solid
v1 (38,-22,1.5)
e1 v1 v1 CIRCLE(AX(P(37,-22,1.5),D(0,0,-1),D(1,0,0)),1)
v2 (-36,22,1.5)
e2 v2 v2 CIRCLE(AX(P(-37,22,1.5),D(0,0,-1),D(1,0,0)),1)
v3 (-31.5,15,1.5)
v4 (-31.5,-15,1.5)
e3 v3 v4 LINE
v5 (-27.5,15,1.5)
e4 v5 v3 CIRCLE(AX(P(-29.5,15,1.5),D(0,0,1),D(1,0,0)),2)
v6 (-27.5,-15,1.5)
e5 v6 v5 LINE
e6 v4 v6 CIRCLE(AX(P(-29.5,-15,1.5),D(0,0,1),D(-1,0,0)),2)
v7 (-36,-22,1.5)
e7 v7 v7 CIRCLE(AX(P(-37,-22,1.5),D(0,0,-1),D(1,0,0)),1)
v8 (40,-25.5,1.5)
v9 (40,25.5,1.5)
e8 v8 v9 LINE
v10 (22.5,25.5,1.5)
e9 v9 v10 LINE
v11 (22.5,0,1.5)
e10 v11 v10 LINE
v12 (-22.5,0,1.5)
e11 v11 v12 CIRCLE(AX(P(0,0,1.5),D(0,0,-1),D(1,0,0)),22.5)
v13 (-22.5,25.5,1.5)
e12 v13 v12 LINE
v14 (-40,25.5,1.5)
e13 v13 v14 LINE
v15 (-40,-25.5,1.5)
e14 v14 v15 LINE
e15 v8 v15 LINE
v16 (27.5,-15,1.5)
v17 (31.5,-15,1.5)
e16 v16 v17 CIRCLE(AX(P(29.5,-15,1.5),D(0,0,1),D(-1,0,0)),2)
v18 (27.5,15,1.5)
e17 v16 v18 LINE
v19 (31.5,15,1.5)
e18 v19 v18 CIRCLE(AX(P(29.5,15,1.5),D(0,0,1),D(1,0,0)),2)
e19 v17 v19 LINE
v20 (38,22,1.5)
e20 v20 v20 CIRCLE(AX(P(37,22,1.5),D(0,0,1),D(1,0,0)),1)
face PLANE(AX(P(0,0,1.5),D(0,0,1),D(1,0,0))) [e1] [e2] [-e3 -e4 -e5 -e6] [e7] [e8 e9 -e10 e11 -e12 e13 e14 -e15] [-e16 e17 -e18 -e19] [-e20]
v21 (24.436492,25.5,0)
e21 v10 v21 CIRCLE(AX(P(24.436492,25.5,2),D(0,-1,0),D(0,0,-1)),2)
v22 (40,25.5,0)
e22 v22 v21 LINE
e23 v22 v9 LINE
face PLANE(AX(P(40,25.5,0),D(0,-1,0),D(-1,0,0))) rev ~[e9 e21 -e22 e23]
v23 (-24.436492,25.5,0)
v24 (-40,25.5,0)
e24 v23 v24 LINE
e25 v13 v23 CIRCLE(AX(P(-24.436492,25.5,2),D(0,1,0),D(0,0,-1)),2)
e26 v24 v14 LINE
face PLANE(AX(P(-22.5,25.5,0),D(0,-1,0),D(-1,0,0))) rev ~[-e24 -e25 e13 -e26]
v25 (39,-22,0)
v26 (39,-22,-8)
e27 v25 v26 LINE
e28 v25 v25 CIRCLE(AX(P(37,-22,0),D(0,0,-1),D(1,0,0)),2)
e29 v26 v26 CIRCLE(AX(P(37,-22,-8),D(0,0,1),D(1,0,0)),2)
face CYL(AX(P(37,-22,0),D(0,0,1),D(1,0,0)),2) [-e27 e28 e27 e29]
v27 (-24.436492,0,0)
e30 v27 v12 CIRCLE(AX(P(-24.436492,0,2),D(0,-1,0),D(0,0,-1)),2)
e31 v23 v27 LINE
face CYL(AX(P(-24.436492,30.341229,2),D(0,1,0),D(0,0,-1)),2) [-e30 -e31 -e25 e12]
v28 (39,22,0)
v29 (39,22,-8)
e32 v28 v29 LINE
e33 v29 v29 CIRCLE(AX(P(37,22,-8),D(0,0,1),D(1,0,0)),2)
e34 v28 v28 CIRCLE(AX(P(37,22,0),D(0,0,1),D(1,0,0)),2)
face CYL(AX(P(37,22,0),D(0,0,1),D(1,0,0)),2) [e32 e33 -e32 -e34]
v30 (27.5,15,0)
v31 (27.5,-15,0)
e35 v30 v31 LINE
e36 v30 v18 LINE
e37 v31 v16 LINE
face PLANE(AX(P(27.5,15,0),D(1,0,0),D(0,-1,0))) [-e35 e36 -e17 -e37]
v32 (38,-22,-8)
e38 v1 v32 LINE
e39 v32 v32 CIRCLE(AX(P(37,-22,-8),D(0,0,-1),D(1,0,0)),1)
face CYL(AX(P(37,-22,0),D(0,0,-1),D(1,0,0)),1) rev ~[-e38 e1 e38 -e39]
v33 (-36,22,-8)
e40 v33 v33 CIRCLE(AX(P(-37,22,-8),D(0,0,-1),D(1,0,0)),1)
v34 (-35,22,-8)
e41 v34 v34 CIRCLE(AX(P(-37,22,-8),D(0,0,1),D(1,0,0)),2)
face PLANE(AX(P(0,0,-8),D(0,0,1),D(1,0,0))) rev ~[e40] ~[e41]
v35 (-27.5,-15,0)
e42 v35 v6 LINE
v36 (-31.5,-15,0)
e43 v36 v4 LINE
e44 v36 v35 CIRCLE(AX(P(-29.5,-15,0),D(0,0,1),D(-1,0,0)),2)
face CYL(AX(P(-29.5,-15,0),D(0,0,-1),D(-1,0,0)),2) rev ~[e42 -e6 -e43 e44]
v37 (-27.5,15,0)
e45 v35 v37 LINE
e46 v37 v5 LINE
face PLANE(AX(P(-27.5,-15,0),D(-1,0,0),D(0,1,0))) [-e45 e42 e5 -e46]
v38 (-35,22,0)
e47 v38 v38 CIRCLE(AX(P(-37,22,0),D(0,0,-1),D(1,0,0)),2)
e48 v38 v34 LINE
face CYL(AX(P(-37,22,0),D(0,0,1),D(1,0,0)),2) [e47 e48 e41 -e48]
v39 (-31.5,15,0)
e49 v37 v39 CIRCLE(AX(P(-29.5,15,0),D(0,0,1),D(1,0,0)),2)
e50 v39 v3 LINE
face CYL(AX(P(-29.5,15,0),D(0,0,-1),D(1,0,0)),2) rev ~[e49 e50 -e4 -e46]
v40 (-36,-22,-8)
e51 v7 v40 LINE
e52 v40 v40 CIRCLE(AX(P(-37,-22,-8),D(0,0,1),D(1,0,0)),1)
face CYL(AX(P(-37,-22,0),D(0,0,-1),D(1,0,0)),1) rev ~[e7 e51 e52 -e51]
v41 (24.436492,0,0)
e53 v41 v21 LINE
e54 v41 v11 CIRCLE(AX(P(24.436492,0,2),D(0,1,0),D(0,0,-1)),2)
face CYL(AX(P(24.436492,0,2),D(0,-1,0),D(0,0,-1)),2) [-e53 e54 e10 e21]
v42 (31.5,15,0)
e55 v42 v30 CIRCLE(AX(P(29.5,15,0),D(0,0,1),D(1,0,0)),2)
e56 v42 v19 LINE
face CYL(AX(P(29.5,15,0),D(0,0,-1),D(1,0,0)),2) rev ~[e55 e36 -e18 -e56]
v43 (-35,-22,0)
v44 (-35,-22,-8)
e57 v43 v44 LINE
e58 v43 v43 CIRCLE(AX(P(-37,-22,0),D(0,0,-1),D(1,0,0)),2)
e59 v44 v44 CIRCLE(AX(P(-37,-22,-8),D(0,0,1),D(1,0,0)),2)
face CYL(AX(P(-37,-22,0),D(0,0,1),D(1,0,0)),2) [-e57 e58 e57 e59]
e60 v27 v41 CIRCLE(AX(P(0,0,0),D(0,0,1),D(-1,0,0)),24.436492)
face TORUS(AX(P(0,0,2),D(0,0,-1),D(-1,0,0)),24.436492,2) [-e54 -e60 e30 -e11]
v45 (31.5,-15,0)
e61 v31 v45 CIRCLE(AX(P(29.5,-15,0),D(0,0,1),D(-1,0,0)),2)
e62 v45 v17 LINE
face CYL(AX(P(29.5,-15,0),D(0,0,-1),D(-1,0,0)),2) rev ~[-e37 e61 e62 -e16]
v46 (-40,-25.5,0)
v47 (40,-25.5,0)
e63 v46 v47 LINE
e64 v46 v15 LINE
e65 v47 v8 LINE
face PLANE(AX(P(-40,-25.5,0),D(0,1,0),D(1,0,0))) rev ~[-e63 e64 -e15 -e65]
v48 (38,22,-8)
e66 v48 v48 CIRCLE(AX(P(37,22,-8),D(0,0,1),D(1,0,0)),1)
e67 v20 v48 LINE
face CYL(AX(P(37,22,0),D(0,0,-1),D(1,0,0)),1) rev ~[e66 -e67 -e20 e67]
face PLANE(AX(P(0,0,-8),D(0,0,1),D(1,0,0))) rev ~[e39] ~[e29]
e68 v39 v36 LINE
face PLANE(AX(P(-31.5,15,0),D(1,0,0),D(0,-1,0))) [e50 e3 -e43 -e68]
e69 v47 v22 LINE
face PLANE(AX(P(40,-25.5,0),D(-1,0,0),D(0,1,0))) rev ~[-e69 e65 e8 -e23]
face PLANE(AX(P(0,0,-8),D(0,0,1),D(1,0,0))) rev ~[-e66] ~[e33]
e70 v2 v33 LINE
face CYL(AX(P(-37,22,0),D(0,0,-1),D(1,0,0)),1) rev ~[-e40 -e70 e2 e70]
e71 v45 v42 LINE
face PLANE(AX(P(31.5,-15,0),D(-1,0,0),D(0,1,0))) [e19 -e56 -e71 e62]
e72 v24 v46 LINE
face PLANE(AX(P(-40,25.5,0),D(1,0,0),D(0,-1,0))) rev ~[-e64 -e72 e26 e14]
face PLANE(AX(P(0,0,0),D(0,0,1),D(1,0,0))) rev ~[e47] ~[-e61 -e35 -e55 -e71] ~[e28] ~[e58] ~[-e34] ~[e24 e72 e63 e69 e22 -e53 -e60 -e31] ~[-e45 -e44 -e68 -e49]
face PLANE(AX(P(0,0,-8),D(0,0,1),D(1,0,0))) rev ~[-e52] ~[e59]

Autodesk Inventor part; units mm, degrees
ref_plane "YZ Plane" through (0, 0, 0) normal (1, 0, 0) x (0, 1, 0)
ref_plane "XZ Plane" through (0, 0, 0) normal (0, 1, 0) x (-1, 0, 0)
ref_plane "XY Plane" through (0, 0, 0) normal (0, 0, 1) x (1, 0, 0)
sketch "Szkic1" plane through (0, 0, 0) normal (0, 0, 1) x (1, 0, 0)
  line L0 (-40, -25.5) -> (40, -25.5)
  line L1 (40, -25.5) -> (40, 25.5)
  line L2 (40, 25.5) -> (-40, 25.5)
  line L3 (-40, 25.5) -> (-40, -25.5)
  line L4 (22.5, 0) -> (22.5, 25.5)
  line L5 (22.5, 25.5) -> (-22.5, 25.5)
  line L6 (-22.5, -25.5) -> (22.5, -25.5)
  line L7 (-29.5, -15) -> (-29.5, 15) construction
  line L8 (-27.5, -15) -> (-27.5, 15)
  line L9 (-31.5, 15) -> (-31.5, -15)
  arc A0 (-31.5, -15) -> (-27.5, -15) centre (-29.5, -15) ccw
  arc A1 (-27.5, 15) -> (-31.5, 15) centre (-29.5, 15) ccw
  line L10 (29.5, -15) -> (29.5, 15) construction
  line L11 (31.5, -15) -> (31.5, 15)
  line L12 (27.5, 15) -> (27.5, -15)
  arc A2 (27.5, -15) -> (31.5, -15) centre (29.5, -15) ccw
  arc A3 (31.5, 15) -> (27.5, 15) centre (29.5, 15) ccw
  line L13 (27.5, 0) -> (29.5, 0)
  arc A4 (-22.5, 0) -> (22.5, 0) centre (0, 0) ccw
  line L14 (-22.5, 25.5) -> (-22.5, 0)
  line L15 (37, -22) -> (-37, -22)
  line L16 (-37, -22) -> (-37, 22)
  line L17 (-37, 22) -> (37, -22) construction
  line L18 (37, 22) -> (-37, -22) construction
  circle A5 centre (-37, -22) radius 1
  circle A6 centre (-37, -22) radius 2
  circle A7 centre (37, -22) radius 2
  circle A8 centre (37, -22) radius 1
  circle A9 centre (-37, 22) radius 2
  circle A10 centre (-37, 22) radius 1
  circle A11 centre (37, 22) radius 2
  circle A12 centre (37, 22) radius 1
  dimension "d1" = 51
  dimension "d14" = 4
  dimension "d15" = 15
  dimension "d16" = 4
  dimension "d26" = 44
  dimension "d27" = 2
  dimension "d28" = 4
  dimension "d31" = 74
  dimension "d34" = 44
extrude "Wyciągnięcie proste1" add sketch "Szkic1" along normal blind 1.5 contours L3 L2 L14 A4 L4 L1 L0 | A6 L16 A5 L15 | L15 A5 L16 A6 | A7 | A9 | A11
extrude "Wyciągnięcie proste2" add sketch "Szkic1" against normal blind 8 contours A6 L16 A5 L15 | L15 A5 L16 A6 | A7 | A9 | A11
fillet "Zaokrąglenie1" radius 2 3 edges at (-22.5, 12.75, 0) (22.5, 12.75, 0) (0, -22.5, 0)
properties part number "FrontHolder"
